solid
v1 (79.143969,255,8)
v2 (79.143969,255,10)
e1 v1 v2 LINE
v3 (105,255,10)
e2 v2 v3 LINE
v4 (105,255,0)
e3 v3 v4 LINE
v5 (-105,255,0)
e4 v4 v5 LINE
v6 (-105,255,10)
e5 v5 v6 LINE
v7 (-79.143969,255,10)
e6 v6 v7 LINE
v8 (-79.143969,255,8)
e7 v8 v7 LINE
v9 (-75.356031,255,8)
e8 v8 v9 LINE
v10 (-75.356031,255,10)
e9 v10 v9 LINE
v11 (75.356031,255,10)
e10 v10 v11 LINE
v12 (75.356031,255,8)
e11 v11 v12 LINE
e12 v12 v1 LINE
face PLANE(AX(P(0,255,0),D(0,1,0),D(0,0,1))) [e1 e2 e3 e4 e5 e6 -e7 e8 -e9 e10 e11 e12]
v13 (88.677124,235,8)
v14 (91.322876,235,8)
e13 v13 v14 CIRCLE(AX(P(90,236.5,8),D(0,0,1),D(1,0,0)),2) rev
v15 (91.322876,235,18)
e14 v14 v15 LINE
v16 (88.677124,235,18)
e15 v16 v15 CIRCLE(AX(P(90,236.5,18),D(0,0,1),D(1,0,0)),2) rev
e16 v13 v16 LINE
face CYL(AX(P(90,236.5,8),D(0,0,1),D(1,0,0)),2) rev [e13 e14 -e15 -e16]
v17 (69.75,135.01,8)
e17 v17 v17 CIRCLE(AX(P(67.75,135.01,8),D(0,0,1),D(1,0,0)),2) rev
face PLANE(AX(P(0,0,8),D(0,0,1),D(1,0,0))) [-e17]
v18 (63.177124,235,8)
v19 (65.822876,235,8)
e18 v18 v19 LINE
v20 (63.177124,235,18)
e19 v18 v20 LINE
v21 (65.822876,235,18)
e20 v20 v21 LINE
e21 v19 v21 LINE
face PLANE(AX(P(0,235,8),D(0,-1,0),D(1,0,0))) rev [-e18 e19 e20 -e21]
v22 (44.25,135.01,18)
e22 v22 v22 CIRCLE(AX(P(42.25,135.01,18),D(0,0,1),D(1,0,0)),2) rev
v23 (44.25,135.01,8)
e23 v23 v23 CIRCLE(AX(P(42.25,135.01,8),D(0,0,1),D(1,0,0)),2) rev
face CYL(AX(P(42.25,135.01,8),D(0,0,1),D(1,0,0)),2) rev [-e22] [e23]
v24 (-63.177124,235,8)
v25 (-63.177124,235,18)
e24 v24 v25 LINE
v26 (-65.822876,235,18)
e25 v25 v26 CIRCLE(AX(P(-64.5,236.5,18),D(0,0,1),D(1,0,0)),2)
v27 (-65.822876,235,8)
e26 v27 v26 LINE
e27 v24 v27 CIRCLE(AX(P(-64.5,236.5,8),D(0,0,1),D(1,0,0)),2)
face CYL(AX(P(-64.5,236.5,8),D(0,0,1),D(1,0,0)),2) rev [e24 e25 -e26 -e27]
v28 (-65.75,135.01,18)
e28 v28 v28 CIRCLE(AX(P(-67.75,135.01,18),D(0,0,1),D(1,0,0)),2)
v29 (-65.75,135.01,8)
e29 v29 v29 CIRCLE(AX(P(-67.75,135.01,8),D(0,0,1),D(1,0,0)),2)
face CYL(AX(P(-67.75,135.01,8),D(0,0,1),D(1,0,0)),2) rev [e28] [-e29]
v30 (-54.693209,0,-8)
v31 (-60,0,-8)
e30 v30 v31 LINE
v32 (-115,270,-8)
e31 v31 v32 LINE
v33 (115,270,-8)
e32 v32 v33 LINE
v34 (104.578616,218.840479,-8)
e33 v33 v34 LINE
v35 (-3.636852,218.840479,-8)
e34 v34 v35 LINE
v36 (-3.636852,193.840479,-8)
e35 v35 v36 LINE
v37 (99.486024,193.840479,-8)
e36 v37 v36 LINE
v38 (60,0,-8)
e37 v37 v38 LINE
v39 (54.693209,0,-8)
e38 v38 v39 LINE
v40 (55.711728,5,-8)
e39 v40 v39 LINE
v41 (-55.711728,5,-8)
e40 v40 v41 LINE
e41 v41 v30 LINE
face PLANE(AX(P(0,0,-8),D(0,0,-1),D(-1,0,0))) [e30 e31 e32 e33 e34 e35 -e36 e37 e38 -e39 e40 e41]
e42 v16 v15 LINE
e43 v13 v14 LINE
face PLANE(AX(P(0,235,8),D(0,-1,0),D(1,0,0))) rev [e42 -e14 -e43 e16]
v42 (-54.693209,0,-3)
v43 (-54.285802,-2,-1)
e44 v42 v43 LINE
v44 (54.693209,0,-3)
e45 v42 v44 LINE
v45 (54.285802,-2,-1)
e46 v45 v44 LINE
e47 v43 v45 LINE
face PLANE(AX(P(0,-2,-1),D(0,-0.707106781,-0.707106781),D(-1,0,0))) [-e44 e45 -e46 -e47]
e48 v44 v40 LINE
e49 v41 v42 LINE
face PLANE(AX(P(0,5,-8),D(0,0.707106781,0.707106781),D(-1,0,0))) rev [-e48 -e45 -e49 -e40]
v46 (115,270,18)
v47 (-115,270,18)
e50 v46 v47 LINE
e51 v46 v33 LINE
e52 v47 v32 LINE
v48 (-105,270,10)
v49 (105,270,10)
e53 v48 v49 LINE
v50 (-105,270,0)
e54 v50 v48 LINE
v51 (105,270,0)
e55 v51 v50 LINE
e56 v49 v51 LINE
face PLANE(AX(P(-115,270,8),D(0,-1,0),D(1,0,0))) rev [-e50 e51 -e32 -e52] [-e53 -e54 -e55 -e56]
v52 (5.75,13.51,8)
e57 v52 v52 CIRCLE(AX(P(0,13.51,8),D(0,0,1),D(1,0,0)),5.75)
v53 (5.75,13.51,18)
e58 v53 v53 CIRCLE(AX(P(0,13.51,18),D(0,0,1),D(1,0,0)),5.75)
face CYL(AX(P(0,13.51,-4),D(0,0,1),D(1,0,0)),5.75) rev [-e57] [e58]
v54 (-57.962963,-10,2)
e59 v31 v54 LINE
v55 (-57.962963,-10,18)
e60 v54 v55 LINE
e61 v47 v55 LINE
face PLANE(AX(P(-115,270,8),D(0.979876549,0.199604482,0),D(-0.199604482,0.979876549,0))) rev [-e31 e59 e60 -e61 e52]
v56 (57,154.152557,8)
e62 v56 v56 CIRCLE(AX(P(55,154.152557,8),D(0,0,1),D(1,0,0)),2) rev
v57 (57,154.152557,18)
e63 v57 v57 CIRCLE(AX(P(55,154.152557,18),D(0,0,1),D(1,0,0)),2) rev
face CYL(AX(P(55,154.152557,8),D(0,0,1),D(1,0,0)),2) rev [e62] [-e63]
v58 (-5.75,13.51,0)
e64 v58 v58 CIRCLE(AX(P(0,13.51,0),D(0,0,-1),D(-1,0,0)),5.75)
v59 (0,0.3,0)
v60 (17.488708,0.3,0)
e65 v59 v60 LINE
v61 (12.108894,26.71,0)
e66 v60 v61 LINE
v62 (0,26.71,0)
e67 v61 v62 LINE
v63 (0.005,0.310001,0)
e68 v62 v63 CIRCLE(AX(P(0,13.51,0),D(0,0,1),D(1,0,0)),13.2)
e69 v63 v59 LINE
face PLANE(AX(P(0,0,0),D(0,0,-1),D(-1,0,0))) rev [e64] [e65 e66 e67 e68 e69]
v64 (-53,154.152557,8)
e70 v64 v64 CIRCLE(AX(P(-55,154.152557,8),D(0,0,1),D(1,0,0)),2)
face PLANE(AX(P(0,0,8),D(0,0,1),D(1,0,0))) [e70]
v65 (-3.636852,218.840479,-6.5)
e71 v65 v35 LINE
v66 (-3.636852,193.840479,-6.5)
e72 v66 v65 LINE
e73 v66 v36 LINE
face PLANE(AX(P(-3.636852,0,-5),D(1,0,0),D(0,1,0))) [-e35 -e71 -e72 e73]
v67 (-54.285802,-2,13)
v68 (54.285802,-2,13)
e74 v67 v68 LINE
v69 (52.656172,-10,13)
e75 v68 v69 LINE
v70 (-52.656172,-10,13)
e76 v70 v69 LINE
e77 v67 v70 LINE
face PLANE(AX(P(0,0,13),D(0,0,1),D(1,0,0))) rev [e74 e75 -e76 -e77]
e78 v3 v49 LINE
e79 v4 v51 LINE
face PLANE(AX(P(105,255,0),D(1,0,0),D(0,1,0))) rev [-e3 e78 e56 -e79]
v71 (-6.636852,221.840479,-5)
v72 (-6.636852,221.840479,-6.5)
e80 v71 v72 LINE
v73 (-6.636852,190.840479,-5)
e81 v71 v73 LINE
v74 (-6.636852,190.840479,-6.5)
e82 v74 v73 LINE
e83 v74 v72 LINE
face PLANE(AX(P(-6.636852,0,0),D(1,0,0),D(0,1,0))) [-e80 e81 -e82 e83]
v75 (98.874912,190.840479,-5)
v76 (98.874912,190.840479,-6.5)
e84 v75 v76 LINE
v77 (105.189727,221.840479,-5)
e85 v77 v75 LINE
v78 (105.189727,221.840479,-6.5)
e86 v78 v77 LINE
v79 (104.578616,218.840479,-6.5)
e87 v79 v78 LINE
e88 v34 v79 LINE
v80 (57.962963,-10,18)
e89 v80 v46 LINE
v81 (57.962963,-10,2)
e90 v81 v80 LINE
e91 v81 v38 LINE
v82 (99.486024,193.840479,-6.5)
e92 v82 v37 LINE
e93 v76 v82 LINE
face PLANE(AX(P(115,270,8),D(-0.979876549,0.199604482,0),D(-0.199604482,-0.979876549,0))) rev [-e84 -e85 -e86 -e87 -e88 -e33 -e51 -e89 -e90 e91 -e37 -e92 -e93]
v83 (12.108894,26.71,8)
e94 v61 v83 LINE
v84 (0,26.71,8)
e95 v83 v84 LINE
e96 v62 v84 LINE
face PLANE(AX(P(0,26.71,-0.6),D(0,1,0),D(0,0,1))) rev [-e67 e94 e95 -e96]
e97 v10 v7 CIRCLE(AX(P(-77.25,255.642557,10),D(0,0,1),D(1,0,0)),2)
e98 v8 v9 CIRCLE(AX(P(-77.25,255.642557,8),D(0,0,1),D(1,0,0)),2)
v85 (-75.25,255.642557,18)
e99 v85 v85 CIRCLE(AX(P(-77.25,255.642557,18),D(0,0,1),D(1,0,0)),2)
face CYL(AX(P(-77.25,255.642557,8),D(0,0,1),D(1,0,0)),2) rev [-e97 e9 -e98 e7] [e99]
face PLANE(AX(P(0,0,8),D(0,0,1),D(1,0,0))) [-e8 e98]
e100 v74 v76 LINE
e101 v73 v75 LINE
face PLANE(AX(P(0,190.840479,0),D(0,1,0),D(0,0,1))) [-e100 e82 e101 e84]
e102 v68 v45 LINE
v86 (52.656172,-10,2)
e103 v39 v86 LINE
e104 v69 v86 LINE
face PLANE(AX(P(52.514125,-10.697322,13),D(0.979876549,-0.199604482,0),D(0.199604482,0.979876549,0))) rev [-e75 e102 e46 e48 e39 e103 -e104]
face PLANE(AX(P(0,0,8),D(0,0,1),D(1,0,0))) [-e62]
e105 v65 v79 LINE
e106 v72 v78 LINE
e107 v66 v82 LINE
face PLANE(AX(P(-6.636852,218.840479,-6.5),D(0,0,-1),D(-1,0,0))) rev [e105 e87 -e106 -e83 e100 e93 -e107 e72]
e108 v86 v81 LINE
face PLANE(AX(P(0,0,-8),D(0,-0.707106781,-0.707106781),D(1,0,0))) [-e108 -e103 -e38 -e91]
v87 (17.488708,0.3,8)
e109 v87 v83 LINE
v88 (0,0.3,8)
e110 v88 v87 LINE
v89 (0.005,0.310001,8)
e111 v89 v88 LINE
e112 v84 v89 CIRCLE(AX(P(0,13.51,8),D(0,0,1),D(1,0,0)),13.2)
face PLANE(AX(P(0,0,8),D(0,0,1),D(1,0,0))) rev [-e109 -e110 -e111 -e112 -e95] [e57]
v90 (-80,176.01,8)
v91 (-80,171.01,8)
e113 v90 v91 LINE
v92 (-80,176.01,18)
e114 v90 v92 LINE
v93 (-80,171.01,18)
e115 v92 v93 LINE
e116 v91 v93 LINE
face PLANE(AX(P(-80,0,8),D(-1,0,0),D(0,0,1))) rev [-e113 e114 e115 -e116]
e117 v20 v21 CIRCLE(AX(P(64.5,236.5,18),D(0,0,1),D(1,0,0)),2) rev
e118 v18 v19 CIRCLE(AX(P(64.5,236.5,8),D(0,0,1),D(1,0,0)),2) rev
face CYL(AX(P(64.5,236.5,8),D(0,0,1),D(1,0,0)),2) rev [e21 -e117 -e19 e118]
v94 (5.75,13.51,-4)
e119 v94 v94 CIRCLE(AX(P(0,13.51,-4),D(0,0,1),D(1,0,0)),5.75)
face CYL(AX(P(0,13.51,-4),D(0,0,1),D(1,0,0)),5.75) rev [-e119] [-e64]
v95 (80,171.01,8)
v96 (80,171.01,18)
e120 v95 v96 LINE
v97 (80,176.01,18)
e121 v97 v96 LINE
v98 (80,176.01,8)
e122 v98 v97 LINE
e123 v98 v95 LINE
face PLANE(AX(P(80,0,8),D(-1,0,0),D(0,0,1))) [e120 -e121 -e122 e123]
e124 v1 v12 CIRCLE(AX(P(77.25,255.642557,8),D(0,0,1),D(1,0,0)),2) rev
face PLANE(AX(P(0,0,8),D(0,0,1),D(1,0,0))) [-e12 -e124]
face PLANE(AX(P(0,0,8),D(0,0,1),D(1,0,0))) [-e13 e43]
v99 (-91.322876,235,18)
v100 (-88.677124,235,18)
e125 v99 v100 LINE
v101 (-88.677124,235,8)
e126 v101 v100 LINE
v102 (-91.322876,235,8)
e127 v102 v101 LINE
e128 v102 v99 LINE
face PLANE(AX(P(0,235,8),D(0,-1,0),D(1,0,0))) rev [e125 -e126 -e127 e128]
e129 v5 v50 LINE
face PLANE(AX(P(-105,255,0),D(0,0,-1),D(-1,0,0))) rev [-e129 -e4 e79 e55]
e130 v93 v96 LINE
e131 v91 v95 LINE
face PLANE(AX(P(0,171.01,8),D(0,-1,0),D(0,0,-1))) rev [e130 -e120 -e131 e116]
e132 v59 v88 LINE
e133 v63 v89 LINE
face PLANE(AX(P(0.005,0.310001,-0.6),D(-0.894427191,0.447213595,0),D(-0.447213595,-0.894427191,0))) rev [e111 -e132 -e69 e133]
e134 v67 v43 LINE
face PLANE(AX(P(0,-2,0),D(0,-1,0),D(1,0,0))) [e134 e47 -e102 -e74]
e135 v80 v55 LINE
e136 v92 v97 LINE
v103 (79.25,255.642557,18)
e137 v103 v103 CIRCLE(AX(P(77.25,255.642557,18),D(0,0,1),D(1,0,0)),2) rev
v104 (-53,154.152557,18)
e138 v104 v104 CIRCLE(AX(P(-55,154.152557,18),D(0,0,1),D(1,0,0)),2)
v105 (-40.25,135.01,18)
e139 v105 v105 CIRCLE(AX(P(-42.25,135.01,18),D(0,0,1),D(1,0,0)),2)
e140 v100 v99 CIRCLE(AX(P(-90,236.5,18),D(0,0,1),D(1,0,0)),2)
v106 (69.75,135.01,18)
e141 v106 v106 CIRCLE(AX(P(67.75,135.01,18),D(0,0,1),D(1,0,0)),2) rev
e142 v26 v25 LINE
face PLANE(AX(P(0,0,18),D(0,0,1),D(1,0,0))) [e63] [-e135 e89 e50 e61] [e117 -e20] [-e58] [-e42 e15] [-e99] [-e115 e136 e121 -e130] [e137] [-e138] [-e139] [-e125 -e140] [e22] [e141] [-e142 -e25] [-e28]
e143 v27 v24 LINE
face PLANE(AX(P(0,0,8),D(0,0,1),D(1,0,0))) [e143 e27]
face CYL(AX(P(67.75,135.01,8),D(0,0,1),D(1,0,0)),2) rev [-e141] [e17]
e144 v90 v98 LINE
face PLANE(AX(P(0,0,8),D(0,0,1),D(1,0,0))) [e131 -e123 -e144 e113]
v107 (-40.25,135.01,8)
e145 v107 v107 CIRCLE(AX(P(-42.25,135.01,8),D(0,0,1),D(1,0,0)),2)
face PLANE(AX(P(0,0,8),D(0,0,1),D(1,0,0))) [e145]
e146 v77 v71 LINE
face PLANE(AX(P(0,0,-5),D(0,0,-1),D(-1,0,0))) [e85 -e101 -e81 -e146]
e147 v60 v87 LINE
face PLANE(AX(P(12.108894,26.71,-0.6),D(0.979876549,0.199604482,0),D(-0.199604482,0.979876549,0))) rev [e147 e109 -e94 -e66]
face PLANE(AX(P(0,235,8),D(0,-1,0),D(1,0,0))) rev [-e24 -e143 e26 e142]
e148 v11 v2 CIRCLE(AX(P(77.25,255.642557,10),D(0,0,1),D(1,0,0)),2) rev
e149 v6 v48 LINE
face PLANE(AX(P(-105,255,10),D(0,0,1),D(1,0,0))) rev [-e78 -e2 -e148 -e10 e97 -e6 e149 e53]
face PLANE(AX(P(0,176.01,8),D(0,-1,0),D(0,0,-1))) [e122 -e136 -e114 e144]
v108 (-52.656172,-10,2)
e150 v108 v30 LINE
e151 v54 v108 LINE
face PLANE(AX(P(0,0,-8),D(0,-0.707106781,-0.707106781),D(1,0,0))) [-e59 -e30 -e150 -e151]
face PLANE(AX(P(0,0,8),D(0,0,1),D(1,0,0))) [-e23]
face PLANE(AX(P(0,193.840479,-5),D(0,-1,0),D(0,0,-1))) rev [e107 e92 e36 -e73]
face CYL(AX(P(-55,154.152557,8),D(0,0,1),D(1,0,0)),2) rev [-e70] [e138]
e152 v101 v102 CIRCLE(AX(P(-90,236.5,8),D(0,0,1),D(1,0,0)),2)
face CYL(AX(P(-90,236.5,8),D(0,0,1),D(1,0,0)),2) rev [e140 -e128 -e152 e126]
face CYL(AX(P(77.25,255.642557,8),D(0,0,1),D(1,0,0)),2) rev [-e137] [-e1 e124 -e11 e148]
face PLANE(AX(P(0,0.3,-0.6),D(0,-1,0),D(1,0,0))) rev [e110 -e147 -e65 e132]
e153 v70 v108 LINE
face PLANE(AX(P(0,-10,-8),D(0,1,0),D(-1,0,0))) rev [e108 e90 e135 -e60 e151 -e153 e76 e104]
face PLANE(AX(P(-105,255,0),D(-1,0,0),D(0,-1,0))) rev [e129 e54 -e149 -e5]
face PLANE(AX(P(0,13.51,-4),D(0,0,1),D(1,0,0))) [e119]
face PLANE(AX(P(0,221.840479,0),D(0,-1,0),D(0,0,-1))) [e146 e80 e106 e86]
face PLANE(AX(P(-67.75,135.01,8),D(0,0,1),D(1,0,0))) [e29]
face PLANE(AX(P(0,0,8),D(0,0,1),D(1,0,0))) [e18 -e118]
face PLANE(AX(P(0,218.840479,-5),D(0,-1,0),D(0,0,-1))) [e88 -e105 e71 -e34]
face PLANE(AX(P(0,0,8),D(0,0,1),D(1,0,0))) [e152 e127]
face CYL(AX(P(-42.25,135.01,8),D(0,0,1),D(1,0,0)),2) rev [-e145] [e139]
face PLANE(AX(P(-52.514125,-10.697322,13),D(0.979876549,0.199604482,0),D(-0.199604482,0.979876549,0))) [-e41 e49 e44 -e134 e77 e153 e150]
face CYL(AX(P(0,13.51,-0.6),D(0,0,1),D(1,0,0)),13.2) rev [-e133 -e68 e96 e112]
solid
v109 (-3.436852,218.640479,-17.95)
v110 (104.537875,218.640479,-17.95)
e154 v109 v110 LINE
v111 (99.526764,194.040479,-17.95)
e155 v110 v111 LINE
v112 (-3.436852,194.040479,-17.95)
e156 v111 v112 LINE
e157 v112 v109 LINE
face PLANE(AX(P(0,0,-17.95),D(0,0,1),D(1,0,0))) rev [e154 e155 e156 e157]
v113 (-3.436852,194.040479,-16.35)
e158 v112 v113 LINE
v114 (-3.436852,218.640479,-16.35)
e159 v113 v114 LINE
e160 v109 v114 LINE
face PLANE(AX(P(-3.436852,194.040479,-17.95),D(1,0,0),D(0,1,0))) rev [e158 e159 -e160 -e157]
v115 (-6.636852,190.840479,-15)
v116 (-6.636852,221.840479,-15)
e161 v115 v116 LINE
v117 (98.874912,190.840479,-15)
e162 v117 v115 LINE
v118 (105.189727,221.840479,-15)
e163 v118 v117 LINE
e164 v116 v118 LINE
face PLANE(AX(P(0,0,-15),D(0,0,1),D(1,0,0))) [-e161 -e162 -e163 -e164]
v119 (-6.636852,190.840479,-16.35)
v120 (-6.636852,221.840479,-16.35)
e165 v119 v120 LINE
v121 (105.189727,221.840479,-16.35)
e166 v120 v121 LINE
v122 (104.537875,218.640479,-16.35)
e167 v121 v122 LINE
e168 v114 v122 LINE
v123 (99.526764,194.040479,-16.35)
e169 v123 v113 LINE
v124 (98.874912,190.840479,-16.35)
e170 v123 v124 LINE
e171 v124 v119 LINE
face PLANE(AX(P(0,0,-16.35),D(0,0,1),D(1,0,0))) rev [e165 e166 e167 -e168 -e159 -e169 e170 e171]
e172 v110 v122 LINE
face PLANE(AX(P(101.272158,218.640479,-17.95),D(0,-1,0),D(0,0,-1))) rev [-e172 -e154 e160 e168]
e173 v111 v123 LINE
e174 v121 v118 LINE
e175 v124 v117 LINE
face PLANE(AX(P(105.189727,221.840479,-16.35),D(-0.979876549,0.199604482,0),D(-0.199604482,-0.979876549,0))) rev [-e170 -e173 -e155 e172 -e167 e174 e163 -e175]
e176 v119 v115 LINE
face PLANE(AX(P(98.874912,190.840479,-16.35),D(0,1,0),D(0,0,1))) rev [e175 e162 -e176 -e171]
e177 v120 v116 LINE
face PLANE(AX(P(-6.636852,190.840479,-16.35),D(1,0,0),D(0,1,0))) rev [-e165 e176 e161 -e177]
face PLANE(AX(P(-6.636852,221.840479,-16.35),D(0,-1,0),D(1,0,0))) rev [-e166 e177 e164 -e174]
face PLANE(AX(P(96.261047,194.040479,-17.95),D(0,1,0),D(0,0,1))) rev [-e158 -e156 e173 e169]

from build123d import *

# Parameters (mm, degrees)
EXTRUDE_1_DEPTH      = 8
CUT_EXTRUDE_1_DEPTH  = 8.6
EXTRUDE_2_DEPTH      = 8
EXTRUDE_3_DEPTH      = 10
SKETCH_7_R           = 5.75
CUT_EXTRUDE_2_DEPTH  = 22
EXTRUDE_5_DEPTH      = 26
CUT_EXTRUDE_4_DEPTH  = 21
CHAMFER_6_SIZE       = 5
CHAMFER_8_SIZE       = 10
SKETCH_13_W          = 210
SKETCH_13_H          = 10
CUT_EXTRUDE_5_DEPTH  = 15
SKETCH_14_W          = 160
SKETCH_14_H          = 5
CUT_EXTRUDE_6_DEPTH  = 10
SKETCH_16_R          = 2
CUT_EXTRUDE_7_DEPTH  = 10
SKETCH_18_W          = 109.386418102
SKETCH_18_H          = 16
EXTRUDE_7_DEPTH      = 2
CHAMFER_10_SIZE      = 2
SKETCH_32_W          = 100
SKETCH_32_H          = 25
CUT_EXTRUDE_16_DEPTH = 3
SKETCH_33_W          = 3
SKETCH_33_H          = 25
CUT_EXTRUDE_17_DEPTH = 1003
SKETCH_34_W          = 1.5
SKETCH_34_H          = 25
CUT_EXTRUDE_19_DEPTH = 3
SKETCH_36_W          = 111.215468024
SKETCH_36_H          = 1.5
CUT_EXTRUDE_20_DEPTH = 3
CUT_EXTRUDE_21_DEPTH = 3
SKETCH_38_W          = 1.5
SKETCH_38_H          = 31
CUT_EXTRUDE_22_DEPTH = 1003
EXTRUDE_8_DEPTH      = 1.35
EXTRUDE_9_DEPTH      = 1.6


with BuildPart() as part:
    # 草图1 → 凸台-拉伸1 (new body)
    with BuildSketch(Plane.XY):
        Polygon((-60, 0), (60, 0), (115, 270), (-115, 270), align=None)
    extrude(amount=EXTRUDE_1_DEPTH)

    # 草图2 → 切除-拉伸1 (cut)
    with BuildSketch(Plane.XY.offset(8)):
        with BuildLine():
            Line((0.005000474, 0.310000947), (0, 0.3))
            Line((0, 0.3), (17.48870838, 0.3))
            Line((17.48870838, 0.3), (12.108893566, 26.71))
            Line((12.108893566, 26.71), (0, 26.71))
            ThreePointArc((0, 26.71), (-13.199999763, 13.507499763), (0.005000474, 0.310000947))
        make_face()
    extrude(amount=-CUT_EXTRUDE_1_DEPTH, mode=Mode.SUBTRACT)

    # 草图5 → 凸台-拉伸2 (add)
    with BuildSketch(Plane(origin=(0, 0, 0), x_dir=(-1, 0, 0), z_dir=(0, 0, -1))):
        Polygon((60, 0), (115, 270), (-115, 270), (-60, 0), align=None)
    extrude(amount=EXTRUDE_2_DEPTH)

    # 草图6 → 凸台-拉伸3 (add)
    with BuildSketch(Plane.XY.offset(8)):
        Polygon((-115, 270), (-60, 0), (60, 0), (115, 270), align=None)
    extrude(amount=EXTRUDE_3_DEPTH)

    # 草图7 → 切除-拉伸2 (cut)
    with BuildSketch(Plane.XY.offset(18)):
        with Locations((0, 13.51)):
            Circle(SKETCH_7_R)
    extrude(amount=-CUT_EXTRUDE_2_DEPTH, mode=Mode.SUBTRACT)

    # 草图9 → 凸台-拉伸5 (add)
    with BuildSketch(Plane.XY.offset(18)):
        Polygon((-57.962962963, -10), (-60, 0), (60, 0), (57.962962963, -10), align=None)
    extrude(amount=-EXTRUDE_5_DEPTH)

    # 草图12 → 切除-拉伸4 (cut)
    with BuildSketch(Plane.XY.offset(-8)):
        Polygon((54.693209051, 0), (-54.693209051, 0), (-52.656172014, -10), (52.656172014, -10), align=None)
    extrude(amount=CUT_EXTRUDE_4_DEPTH, mode=Mode.SUBTRACT)

    # 倒角6
    chamfer_6_edges = [part.edges().sort_by_distance(p)[0] for p in [
        (0, 0, -8),
    ]]
    chamfer(chamfer_6_edges, length=CHAMFER_6_SIZE)

    # 倒角8
    chamfer_8_edges = [part.edges().sort_by_distance(p)[0] for p in [
        (55.309567488, -10, -8),
        (-55.309567488, -10, -8),
    ]]
    chamfer(chamfer_8_edges, length=CHAMFER_8_SIZE)

    # 草图13 → 切除-拉伸5 (cut)
    with BuildSketch(Plane(origin=(0, 270, 0), x_dir=(1, 0, 0), z_dir=(0, 1, 0))):
        with Locations((0, -5)):
            Rectangle(SKETCH_13_W, SKETCH_13_H)
    extrude(amount=-CUT_EXTRUDE_5_DEPTH, mode=Mode.SUBTRACT)

    # 草图14 → 切除-拉伸6 (cut)
    with BuildSketch(Plane.XY.offset(18)):
        with Locations((0, 173.51)):
            Rectangle(SKETCH_14_W, SKETCH_14_H)
    extrude(amount=-CUT_EXTRUDE_6_DEPTH, mode=Mode.SUBTRACT)

    # 草图16 → 切除-拉伸7 (cut)
    with BuildSketch(Plane.XY.offset(18)):
        with BuildLine():
            ThreePointArc((-88.677124344, 235), (-90, 238.5), (-91.322875656, 235))
            Line((-91.322875656, 235), (-88.677124344, 235))
        make_face()
        with BuildLine():
            ThreePointArc((91.322875656, 235), (90, 238.5), (88.677124344, 235))
            Line((88.677124344, 235), (91.322875656, 235))
        make_face()
        with BuildLine():
            ThreePointArc((65.822875656, 235), (64.5, 238.5), (63.177124344, 235))
            Line((63.177124344, 235), (65.822875656, 235))
        make_face()
        with BuildLine():
            ThreePointArc((-63.177124344, 235), (-64.5, 238.5), (-65.822875656, 235))
            Line((-65.822875656, 235), (-63.177124344, 235))
        make_face()
        with Locations((-77.25, 255.6425573)):
            Circle(SKETCH_16_R)
        with Locations((77.25, 255.6425573)):
            Circle(SKETCH_16_R)
        with Locations((-55, 154.1525573)):
            Circle(SKETCH_16_R)
        with Locations((-67.75, 135.01)):
            Circle(SKETCH_16_R)
        with Locations((-42.25, 135.01)):
            Circle(SKETCH_16_R)
        with Locations((42.25, 135.01)):
            Circle(SKETCH_16_R)
        with Locations((67.75, 135.01)):
            Circle(SKETCH_16_R)
        with Locations((55, 154.1525573)):
            Circle(SKETCH_16_R)
    extrude(amount=-CUT_EXTRUDE_7_DEPTH, mode=Mode.SUBTRACT)

    # 草图18 → 凸台-拉伸7 (add)
    with BuildSketch(Plane.XZ):
        with Locations((0, 5)):
            Rectangle(SKETCH_18_W, SKETCH_18_H)
    extrude(amount=EXTRUDE_7_DEPTH)

    # 倒角10
    chamfer_10_edges = [part.edges().sort_by_distance(p)[0] for p in [
        (0, -2, -3),
    ]]
    chamfer(chamfer_10_edges, length=CHAMFER_10_SIZE - 0.0001)  # a hair under: the kernel refuses the full size

    # 草图32 → 切除-拉伸16 (cut)
    with BuildSketch(Plane(origin=(0, 0, -8), x_dir=(-1, 0, 0), z_dir=(0, 0, -1))):
        with Locations((-46.363148148, 206.34047939)):
            Rectangle(SKETCH_32_W, SKETCH_32_H)
    extrude(amount=-CUT_EXTRUDE_16_DEPTH, mode=Mode.SUBTRACT)

    # 草图33 → 切除-拉伸17 (cut)
    with BuildSketch(Plane(origin=(-3.636851852, 0, 0), x_dir=(0, 0, -1), z_dir=(1, 0, 0))):
        with Locations((6.5, 206.34047939)):
            Rectangle(SKETCH_33_W, SKETCH_33_H)
    extrude(amount=CUT_EXTRUDE_17_DEPTH, mode=Mode.SUBTRACT)

    # 草图34 → 切除-拉伸19 (cut)
    with BuildSketch(Plane(origin=(-3.636851852, 0, 0), x_dir=(0, 0, -1), z_dir=(1, 0, 0))):
        with Locations((5.75, 206.34047939)):
            Rectangle(SKETCH_34_W, SKETCH_34_H)
    extrude(amount=-CUT_EXTRUDE_19_DEPTH, mode=Mode.SUBTRACT)

    # 草图36 → 切除-拉伸20 (cut)
    with BuildSketch(Plane.XZ.offset(-218.84047939)):
        with Locations((48.97088216, -5.75)):
            Rectangle(SKETCH_36_W, SKETCH_36_H)
    extrude(amount=-CUT_EXTRUDE_20_DEPTH, mode=Mode.SUBTRACT)

    # 草图37 → 切除-拉伸21 (cut)
    with BuildSketch(Plane(origin=(0, 193.84047939, 0), x_dir=(1, 0, 0), z_dir=(0, 1, 0))):
        Polygon((-6.636851852, 6.5), (-6.636851852, 5), (99.486023579, 5), (99.486023579, 6.5), (-3.636851852, 6.5), align=None)
    extrude(amount=-CUT_EXTRUDE_21_DEPTH, mode=Mode.SUBTRACT)

    # 草图38 → 切除-拉伸22 (cut)
    with BuildSketch(Plane(origin=(-6.636851852, 0, 0), x_dir=(0, 0, -1), z_dir=(1, 0, 0))):
        with Locations((5.75, 206.34047939)):
            Rectangle(SKETCH_38_W, SKETCH_38_H)
    extrude(amount=CUT_EXTRUDE_22_DEPTH, mode=Mode.SUBTRACT)


with BuildPart() as body_2:
    # 草图39 → 凸台-拉伸8 (new body)
    with BuildSketch(Plane(origin=(0, 0, -15), x_dir=(-1, 0, 0), z_dir=(0, 0, -1))):
        Polygon((-105.189727283, 221.84047939), (-98.874912468, 190.84047939), (6.636851852, 190.84047939), (6.636851852, 221.84047939), align=None)
    extrude(amount=EXTRUDE_8_DEPTH)

    # 草图41 → 凸台-拉伸9 (add)
    with BuildSketch(Plane(origin=(0, 0, -16.35), x_dir=(-1, 0, 0), z_dir=(0, 0, -1))):
        Polygon((-101.272157924, 218.64047939), (-104.537875431, 218.64047939), (-99.52676432, 194.04047939), (-96.261046813, 194.04047939), (3.436851852, 194.04047939), (3.436851852, 218.64047939), align=None)
    extrude(amount=EXTRUDE_9_DEPTH)


solid = Compound([part.part, body_2.part])
